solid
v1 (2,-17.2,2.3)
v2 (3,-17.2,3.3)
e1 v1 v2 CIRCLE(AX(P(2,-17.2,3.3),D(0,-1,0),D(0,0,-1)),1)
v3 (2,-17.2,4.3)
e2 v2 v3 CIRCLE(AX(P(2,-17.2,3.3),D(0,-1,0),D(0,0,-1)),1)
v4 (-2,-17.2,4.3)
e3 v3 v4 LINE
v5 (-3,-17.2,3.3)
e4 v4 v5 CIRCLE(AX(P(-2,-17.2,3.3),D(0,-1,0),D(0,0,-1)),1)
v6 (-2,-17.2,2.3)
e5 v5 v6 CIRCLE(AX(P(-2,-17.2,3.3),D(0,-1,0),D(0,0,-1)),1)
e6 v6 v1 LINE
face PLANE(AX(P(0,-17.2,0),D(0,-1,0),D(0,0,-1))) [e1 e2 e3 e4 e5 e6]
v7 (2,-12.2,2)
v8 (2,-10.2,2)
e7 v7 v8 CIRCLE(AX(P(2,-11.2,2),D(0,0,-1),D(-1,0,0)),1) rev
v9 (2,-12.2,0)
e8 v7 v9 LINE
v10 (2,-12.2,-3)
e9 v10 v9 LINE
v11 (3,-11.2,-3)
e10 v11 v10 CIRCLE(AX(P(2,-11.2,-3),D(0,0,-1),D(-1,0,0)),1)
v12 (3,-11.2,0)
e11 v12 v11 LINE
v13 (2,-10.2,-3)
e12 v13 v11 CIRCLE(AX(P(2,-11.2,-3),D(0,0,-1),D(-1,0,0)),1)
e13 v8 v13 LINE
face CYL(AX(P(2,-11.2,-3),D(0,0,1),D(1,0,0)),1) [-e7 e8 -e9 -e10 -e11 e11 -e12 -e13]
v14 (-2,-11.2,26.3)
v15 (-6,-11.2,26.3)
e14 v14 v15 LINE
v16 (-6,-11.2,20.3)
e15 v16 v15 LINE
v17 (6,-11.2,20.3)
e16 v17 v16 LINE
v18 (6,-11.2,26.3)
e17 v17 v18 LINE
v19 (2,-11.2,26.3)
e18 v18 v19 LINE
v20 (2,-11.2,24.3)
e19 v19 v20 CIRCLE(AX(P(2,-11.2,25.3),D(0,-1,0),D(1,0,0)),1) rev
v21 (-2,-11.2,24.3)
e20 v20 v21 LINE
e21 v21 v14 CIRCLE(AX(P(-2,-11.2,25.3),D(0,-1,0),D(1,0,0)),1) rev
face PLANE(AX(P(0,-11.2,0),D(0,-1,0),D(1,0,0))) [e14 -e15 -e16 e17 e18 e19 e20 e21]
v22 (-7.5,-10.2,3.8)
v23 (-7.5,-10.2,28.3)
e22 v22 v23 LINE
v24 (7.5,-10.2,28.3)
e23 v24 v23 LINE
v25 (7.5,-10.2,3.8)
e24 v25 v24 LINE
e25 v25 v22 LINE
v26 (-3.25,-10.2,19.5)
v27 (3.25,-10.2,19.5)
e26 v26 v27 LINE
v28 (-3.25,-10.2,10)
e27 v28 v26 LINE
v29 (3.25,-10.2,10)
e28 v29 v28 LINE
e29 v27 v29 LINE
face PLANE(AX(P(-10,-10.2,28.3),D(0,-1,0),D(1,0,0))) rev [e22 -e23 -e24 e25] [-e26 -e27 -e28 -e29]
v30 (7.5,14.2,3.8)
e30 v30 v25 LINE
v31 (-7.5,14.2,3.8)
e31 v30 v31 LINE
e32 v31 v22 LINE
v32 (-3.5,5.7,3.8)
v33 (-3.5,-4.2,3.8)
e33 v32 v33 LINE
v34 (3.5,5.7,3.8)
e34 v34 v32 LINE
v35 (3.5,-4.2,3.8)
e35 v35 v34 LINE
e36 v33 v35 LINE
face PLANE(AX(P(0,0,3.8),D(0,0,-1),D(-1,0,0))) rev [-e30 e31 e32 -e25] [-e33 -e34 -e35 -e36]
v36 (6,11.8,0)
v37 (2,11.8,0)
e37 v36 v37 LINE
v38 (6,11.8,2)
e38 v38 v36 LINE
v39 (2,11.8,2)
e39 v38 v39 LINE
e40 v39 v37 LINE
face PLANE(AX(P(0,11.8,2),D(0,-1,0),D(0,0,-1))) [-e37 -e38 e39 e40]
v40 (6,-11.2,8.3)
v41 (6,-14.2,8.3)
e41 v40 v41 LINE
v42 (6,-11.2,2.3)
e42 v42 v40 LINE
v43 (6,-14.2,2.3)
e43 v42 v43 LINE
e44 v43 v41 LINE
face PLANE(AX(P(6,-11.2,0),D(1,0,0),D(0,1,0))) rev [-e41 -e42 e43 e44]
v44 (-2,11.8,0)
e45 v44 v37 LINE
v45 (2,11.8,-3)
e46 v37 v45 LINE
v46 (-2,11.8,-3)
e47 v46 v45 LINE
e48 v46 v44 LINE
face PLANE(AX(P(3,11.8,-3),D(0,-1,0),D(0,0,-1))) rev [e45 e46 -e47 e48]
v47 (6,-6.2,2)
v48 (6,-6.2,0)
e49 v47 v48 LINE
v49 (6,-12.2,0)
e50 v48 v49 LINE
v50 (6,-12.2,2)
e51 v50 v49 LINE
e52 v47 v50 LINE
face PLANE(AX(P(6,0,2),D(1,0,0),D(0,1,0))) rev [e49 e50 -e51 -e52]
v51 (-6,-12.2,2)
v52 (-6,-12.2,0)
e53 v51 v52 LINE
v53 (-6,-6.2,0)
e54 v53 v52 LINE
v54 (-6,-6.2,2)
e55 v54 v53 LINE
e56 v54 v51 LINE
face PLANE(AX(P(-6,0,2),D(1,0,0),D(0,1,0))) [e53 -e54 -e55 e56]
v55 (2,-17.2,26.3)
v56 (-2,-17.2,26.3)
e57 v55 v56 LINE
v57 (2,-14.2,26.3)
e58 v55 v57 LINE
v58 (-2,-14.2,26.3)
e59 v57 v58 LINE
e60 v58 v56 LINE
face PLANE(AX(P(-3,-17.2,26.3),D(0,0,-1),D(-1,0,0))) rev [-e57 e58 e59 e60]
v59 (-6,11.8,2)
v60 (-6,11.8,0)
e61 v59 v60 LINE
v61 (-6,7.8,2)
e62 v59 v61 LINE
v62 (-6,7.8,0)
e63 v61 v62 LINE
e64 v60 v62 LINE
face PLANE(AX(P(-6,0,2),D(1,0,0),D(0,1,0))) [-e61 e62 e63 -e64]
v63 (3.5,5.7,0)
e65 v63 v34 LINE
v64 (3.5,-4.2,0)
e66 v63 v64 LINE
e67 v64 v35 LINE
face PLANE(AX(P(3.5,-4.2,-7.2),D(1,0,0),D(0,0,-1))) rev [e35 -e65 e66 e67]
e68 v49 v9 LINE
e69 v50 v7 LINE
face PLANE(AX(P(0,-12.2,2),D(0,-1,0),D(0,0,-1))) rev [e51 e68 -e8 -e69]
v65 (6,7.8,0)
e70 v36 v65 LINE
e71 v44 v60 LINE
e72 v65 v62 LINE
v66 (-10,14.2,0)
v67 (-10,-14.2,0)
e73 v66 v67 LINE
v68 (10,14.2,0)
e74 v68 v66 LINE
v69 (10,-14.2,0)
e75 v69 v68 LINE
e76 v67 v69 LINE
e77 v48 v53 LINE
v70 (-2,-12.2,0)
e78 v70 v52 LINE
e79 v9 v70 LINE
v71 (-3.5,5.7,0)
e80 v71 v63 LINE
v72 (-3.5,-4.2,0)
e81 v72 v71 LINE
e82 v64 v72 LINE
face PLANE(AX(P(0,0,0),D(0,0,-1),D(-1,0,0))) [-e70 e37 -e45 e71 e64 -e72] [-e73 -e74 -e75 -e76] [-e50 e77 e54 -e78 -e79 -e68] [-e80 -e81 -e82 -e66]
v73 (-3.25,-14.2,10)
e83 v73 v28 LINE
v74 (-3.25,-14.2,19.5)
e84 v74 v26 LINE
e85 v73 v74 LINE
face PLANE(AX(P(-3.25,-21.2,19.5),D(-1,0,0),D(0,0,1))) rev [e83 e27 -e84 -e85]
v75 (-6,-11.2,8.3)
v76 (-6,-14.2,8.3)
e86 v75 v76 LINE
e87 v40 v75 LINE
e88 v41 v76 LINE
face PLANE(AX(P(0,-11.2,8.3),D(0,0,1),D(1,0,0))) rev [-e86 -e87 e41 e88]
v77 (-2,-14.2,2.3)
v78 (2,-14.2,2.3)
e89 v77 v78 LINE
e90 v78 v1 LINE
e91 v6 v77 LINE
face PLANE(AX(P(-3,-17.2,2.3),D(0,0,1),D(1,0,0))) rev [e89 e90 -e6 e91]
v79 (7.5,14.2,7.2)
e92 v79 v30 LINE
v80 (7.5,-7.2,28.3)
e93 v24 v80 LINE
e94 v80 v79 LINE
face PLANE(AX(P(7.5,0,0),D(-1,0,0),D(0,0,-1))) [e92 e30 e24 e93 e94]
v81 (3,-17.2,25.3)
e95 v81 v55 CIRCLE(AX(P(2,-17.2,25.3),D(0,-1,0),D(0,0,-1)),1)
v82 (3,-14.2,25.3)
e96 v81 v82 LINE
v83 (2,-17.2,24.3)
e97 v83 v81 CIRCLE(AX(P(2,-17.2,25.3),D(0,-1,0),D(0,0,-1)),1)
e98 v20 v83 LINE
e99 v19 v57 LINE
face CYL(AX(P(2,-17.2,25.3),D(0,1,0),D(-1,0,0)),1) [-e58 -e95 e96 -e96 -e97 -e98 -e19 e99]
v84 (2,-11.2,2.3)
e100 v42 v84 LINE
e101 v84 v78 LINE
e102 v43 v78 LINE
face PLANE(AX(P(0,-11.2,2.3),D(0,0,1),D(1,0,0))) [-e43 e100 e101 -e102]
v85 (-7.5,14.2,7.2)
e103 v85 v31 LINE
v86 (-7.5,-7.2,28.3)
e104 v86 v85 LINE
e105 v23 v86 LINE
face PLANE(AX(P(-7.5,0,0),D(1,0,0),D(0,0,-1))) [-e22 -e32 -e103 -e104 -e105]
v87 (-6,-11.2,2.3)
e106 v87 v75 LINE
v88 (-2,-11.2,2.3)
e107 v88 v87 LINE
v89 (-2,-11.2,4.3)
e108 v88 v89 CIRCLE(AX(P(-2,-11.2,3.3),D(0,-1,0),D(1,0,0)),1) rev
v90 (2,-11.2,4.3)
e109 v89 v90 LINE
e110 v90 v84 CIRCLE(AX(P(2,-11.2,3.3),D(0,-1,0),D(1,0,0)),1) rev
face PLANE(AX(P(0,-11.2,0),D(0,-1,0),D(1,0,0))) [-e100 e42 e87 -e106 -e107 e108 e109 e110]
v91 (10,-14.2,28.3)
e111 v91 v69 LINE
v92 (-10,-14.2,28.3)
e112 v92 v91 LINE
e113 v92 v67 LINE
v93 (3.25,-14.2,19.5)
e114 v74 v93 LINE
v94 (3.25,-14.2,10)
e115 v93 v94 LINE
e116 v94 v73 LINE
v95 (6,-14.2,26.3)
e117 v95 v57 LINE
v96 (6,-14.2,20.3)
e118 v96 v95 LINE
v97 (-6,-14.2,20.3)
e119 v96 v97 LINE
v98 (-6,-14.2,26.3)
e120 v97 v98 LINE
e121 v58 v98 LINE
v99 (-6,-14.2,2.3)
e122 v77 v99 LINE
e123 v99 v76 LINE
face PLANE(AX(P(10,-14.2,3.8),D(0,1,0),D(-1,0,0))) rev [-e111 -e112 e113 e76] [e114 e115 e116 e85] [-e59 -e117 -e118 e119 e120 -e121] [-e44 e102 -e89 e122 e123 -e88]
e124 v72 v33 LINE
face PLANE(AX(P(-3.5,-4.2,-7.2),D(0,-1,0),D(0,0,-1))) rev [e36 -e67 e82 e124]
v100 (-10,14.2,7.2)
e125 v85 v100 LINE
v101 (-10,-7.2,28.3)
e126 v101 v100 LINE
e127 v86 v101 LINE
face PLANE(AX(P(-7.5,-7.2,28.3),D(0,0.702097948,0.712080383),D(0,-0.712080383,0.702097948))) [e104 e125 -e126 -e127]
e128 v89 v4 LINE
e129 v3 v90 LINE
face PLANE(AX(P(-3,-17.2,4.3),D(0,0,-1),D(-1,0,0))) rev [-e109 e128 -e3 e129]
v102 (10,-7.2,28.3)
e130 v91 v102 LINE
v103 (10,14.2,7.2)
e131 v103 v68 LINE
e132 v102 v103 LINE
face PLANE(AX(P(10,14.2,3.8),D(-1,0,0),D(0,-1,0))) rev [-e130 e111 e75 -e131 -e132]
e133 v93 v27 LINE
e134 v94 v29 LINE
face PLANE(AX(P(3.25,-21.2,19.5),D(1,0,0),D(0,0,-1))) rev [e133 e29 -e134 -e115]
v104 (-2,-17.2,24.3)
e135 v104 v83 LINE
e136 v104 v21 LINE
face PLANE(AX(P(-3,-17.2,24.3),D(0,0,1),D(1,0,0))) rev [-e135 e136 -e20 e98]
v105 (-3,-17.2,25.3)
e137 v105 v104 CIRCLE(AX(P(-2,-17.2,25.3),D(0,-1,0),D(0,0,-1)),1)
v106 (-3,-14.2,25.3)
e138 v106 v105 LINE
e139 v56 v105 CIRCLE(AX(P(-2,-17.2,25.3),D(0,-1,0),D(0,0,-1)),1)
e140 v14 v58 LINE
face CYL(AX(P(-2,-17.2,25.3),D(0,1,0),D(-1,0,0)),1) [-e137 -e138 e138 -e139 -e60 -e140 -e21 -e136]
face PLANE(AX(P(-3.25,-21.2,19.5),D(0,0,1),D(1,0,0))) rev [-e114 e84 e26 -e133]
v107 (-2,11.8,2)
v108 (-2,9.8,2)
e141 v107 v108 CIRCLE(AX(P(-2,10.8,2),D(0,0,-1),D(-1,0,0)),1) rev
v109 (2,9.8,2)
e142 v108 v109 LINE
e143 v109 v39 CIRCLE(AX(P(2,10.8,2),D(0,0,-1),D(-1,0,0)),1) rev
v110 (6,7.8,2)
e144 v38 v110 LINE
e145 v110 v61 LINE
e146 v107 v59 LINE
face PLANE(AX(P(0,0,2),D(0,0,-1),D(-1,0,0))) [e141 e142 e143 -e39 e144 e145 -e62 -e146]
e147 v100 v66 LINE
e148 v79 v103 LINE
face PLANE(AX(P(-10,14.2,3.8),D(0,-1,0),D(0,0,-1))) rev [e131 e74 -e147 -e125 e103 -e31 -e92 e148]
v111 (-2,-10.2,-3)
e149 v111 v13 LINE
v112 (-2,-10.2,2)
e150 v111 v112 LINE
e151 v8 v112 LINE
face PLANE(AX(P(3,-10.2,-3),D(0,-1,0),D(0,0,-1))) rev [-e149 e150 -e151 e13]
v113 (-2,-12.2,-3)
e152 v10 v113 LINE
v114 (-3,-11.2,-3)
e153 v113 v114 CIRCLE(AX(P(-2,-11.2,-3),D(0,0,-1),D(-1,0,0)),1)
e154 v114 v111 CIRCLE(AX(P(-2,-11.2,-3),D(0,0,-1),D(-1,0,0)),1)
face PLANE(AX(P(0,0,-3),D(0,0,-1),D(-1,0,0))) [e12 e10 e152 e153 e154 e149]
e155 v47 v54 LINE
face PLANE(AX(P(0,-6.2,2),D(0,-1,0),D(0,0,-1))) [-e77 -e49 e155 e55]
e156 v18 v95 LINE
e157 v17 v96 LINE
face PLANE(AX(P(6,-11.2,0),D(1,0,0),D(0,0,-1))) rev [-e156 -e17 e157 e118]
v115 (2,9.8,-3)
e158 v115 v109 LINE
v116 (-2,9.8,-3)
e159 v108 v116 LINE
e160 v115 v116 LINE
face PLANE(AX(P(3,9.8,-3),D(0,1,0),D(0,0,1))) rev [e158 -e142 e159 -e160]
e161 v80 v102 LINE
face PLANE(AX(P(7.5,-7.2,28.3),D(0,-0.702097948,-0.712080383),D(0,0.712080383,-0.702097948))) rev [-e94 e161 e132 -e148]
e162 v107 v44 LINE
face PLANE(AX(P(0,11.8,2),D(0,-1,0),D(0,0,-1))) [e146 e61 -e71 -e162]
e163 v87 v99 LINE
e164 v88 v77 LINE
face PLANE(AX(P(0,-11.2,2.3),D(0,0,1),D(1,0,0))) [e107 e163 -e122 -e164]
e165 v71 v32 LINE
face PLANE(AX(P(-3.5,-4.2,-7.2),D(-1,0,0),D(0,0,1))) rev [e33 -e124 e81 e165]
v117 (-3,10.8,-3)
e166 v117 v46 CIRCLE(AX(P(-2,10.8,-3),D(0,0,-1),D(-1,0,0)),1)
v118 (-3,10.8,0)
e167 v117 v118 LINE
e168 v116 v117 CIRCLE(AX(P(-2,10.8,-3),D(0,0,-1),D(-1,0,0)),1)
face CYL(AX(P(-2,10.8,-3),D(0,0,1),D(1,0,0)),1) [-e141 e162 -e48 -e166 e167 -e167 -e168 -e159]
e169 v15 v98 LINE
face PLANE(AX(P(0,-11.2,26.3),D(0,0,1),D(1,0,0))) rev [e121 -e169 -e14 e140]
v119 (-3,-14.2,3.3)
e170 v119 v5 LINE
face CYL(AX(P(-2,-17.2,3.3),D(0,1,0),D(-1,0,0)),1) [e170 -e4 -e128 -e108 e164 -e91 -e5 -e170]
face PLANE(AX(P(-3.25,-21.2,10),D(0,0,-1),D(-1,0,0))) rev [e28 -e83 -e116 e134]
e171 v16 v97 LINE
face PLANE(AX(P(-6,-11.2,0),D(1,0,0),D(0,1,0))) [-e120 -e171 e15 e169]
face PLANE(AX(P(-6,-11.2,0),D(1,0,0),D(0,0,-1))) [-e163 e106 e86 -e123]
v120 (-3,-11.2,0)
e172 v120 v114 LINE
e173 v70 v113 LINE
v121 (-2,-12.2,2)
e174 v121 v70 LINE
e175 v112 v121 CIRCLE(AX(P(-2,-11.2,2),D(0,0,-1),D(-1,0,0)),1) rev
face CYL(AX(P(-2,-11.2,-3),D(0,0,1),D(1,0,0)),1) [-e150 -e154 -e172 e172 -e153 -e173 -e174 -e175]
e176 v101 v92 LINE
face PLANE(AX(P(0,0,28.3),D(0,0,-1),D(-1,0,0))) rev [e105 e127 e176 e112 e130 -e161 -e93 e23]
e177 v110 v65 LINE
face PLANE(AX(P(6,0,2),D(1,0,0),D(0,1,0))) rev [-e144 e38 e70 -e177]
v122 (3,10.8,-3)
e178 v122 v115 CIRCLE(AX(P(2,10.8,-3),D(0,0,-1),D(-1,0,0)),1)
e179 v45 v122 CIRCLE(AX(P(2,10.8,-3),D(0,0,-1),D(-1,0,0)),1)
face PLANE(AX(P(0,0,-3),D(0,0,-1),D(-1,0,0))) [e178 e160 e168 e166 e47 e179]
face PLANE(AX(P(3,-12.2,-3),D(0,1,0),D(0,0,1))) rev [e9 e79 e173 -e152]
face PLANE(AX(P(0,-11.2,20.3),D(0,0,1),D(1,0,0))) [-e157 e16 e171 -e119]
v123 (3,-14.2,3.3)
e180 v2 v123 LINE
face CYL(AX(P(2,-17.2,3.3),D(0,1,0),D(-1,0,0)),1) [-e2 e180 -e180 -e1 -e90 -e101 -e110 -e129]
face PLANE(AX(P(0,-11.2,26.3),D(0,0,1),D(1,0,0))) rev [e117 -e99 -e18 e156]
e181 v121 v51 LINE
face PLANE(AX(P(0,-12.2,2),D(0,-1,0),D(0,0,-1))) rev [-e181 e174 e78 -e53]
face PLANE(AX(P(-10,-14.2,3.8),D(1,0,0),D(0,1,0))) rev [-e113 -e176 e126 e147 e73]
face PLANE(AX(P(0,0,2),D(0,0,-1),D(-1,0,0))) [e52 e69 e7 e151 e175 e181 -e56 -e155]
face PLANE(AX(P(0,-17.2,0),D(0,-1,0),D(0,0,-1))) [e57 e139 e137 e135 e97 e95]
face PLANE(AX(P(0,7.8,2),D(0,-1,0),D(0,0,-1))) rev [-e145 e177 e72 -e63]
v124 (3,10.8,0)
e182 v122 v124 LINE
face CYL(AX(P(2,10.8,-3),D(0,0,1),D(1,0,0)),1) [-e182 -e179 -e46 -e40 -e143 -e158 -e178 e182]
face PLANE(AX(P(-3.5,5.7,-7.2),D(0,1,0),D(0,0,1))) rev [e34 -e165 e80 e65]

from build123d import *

# Parameters (mm, degrees)
SKETCH1_W                      = 20
SKETCH1_H                      = 28.4
BACK_WALL_DEPTH                = 3.8
SKETCH3_W                      = 20
SKETCH3_H                      = 4
BOTTOM_WALL_DEPTH              = 24.5
LEFT_WALL_DEPTH                = 2.5
SKETCH6_W                      = 6.5
SKETCH6_H                      = 9.5
BOTTOM_CONNECTION_CUTOUT_DEPTH = 11
SKETCH7_W                      = 7
SKETCH7_H                      = 9.9
TOP_CONNECTION_CUTOUT_DEPTH    = 11
SKETCH8_W                      = 6
SKETCH8_H                      = 2
BOTTOM_NOTCH_DEPTH             = 3
SKETCH9_W                      = 6
SKETCH9_H                      = 2
TOP_NOTCH_DEPTH                = 3
FILLET1_R                      = 1
BOTTOM_LIGHTENING_CUTOUT_DEPTH = 3
CUT_EXTRUDE2_DEPTH             = 2


with BuildPart() as part:
    # Sketch1 → back_wall (new body)
    with BuildSketch(Plane.XY):
        Rectangle(SKETCH1_W, SKETCH1_H)
    extrude(amount=BACK_WALL_DEPTH)

    # Sketch3 → bottom_wall (add)
    with BuildSketch(Plane.XY.offset(3.8)):
        with Locations((0, -12.2)):
            Rectangle(SKETCH3_W, SKETCH3_H)
    extrude(amount=BOTTOM_WALL_DEPTH)

    # Sketch4 → left_wall (add)
    with BuildSketch(Plane.ZY.offset(10)):
        Polygon((3.8, 14.2), (7.2, 14.2), (28.3, -7.2), (28.3, -10.2), (3.8, -10.2), align=None)
    left_wall = extrude(amount=-LEFT_WALL_DEPTH)

    # right_wall: left_wall across plane
    add(left_wall.mirror(Plane(origin=(0, 0, 0), x_dir=(0, 0, 1), z_dir=(1, 0, 0))))

    # Sketch6 → bottom_connection_cutout (cut)
    with BuildSketch(Plane(origin=(0, -10.2, 0), x_dir=(1, 0, 0), z_dir=(0, 1, 0))):
        with Locations((0, -14.75)):
            Rectangle(SKETCH6_W, SKETCH6_H)
    extrude(amount=-BOTTOM_CONNECTION_CUTOUT_DEPTH, mode=Mode.SUBTRACT)

    # Sketch7 → top_connection_cutout (cut)
    with BuildSketch(Plane.XY.offset(3.8)):
        with Locations((0, 0.75)):
            Rectangle(SKETCH7_W, SKETCH7_H)
    extrude(amount=-TOP_CONNECTION_CUTOUT_DEPTH, mode=Mode.SUBTRACT)

    # Sketch8 → bottom_notch (add)
    with BuildSketch(Plane.XZ.offset(14.2)):
        with Locations((0, 25.3)):
            Rectangle(SKETCH8_W, SKETCH8_H)
        with Locations((0, 3.3)):
            Rectangle(SKETCH8_W, SKETCH8_H)
    extrude(amount=BOTTOM_NOTCH_DEPTH)

    # Sketch9 → top_notch (add)
    with BuildSketch(Plane(origin=(0, 0, 0), x_dir=(-1, 0, 0), z_dir=(0, 0, -1))):
        with Locations((0, -11.2)):
            Rectangle(SKETCH9_W, SKETCH9_H)
        with Locations((0, 10.8)):
            Rectangle(SKETCH9_W, SKETCH9_H)
    extrude(amount=TOP_NOTCH_DEPTH)

    # Fillet1
    fillet1_edges = [part.edges().sort_by_distance(p)[0] for p in [
        (3, 9.8, -1.5),
        (3, 11.8, -1.5),
        (-3, 11.8, -1.5),
        (-3, 9.8, -1.5),
        (-3, -12.2, -1.5),
        (-3, -10.2, -1.5),
        (3, -10.2, -1.5),
        (3, -12.2, -1.5),
        (3, -15.7, 4.3),
        (3, -15.7, 2.3),
        (-3, -15.7, 4.3),
        (-3, -15.7, 2.3),
        (-3, -15.7, 26.3),
        (-3, -15.7, 24.3),
        (3, -15.7, 26.3),
        (3, -15.7, 24.3),
    ]]
    fillet(fillet1_edges, radius=FILLET1_R - 0.0001)  # a hair under: the kernel refuses the full size

    # Sketch11 → bottom_lightening_cutout (cut)
    with BuildSketch(Plane.XZ.offset(14.2)):
        with BuildLine():
            Line((2, 2.3), (6, 2.3))
            Line((6, 2.3), (6, 8.3))
            Line((6, 8.3), (-6, 8.3))
            Line((-6, 8.3), (-6, 2.3))
            Line((-6, 2.3), (-2, 2.3))
            ThreePointArc((-2, 2.3), (-2.707106781, 2.592893219), (-3, 3.3))
            ThreePointArc((-3, 3.3), (-2.707106781, 4.007106781), (-2, 4.3))
            Line((-2, 4.3), (2, 4.3))
            ThreePointArc((2, 4.3), (2.707106781, 4.007106781), (3, 3.3))
            ThreePointArc((3, 3.3), (2.707106781, 2.592893219), (2, 2.3))
        make_face()
        with BuildLine():
            Line((-6, 20.3), (6, 20.3))
            Line((6, 20.3), (6, 26.3))
            Line((6, 26.3), (2, 26.3))
            ThreePointArc((2, 26.3), (2.707106781, 26.007106781), (3, 25.3))
            ThreePointArc((3, 25.3), (2.707106781, 24.592893219), (2, 24.3))
            Line((2, 24.3), (-2, 24.3))
            ThreePointArc((-2, 24.3), (-2.707106781, 24.592893219), (-3, 25.3))
            ThreePointArc((-3, 25.3), (-2.707106781, 26.007106781), (-2, 26.3))
            Line((-2, 26.3), (-6, 26.3))
            Line((-6, 26.3), (-6, 20.3))
        make_face()
    extrude(amount=-BOTTOM_LIGHTENING_CUTOUT_DEPTH, mode=Mode.SUBTRACT)

    # Sketch13 → Cut-Extrude2 (cut)
    with BuildSketch(Plane(origin=(0, 0, 0), x_dir=(-1, 0, 0), z_dir=(0, 0, -1))):
        with BuildLine():
            Line((-2, 11.8), (-6, 11.8))
            Line((-6, 11.8), (-6, 7.8))
            Line((-6, 7.8), (6, 7.8))
            Line((6, 7.8), (6, 11.8))
            Line((6, 11.8), (2, 11.8))
            ThreePointArc((2, 11.8), (2.707106781, 11.507106781), (3, 10.8))
            ThreePointArc((3, 10.8), (2.707106781, 10.092893219), (2, 9.8))
            Line((2, 9.8), (-2, 9.8))
            ThreePointArc((-2, 9.8), (-2.707106781, 10.092893219), (-3, 10.8))
            ThreePointArc((-3, 10.8), (-2.707106781, 11.507106781), (-2, 11.8))
        make_face()
        with BuildLine():
            Line((6, -6.2), (-6, -6.2))
            Line((-6, -6.2), (-6, -12.2))
            Line((-6, -12.2), (-2, -12.2))
            ThreePointArc((-2, -12.2), (-2.707106781, -11.907106781), (-3, -11.2))
            ThreePointArc((-3, -11.2), (-2.707106781, -10.492893219), (-2, -10.2))
            Line((-2, -10.2), (2, -10.2))
            ThreePointArc((2, -10.2), (2.707106781, -10.492893219), (3, -11.2))
            ThreePointArc((3, -11.2), (2.707106781, -11.907106781), (2, -12.2))
            Line((2, -12.2), (6, -12.2))
            Line((6, -12.2), (6, -6.2))
        make_face()
    extrude(amount=-CUT_EXTRUDE2_DEPTH, mode=Mode.SUBTRACT)


solid = part.part
